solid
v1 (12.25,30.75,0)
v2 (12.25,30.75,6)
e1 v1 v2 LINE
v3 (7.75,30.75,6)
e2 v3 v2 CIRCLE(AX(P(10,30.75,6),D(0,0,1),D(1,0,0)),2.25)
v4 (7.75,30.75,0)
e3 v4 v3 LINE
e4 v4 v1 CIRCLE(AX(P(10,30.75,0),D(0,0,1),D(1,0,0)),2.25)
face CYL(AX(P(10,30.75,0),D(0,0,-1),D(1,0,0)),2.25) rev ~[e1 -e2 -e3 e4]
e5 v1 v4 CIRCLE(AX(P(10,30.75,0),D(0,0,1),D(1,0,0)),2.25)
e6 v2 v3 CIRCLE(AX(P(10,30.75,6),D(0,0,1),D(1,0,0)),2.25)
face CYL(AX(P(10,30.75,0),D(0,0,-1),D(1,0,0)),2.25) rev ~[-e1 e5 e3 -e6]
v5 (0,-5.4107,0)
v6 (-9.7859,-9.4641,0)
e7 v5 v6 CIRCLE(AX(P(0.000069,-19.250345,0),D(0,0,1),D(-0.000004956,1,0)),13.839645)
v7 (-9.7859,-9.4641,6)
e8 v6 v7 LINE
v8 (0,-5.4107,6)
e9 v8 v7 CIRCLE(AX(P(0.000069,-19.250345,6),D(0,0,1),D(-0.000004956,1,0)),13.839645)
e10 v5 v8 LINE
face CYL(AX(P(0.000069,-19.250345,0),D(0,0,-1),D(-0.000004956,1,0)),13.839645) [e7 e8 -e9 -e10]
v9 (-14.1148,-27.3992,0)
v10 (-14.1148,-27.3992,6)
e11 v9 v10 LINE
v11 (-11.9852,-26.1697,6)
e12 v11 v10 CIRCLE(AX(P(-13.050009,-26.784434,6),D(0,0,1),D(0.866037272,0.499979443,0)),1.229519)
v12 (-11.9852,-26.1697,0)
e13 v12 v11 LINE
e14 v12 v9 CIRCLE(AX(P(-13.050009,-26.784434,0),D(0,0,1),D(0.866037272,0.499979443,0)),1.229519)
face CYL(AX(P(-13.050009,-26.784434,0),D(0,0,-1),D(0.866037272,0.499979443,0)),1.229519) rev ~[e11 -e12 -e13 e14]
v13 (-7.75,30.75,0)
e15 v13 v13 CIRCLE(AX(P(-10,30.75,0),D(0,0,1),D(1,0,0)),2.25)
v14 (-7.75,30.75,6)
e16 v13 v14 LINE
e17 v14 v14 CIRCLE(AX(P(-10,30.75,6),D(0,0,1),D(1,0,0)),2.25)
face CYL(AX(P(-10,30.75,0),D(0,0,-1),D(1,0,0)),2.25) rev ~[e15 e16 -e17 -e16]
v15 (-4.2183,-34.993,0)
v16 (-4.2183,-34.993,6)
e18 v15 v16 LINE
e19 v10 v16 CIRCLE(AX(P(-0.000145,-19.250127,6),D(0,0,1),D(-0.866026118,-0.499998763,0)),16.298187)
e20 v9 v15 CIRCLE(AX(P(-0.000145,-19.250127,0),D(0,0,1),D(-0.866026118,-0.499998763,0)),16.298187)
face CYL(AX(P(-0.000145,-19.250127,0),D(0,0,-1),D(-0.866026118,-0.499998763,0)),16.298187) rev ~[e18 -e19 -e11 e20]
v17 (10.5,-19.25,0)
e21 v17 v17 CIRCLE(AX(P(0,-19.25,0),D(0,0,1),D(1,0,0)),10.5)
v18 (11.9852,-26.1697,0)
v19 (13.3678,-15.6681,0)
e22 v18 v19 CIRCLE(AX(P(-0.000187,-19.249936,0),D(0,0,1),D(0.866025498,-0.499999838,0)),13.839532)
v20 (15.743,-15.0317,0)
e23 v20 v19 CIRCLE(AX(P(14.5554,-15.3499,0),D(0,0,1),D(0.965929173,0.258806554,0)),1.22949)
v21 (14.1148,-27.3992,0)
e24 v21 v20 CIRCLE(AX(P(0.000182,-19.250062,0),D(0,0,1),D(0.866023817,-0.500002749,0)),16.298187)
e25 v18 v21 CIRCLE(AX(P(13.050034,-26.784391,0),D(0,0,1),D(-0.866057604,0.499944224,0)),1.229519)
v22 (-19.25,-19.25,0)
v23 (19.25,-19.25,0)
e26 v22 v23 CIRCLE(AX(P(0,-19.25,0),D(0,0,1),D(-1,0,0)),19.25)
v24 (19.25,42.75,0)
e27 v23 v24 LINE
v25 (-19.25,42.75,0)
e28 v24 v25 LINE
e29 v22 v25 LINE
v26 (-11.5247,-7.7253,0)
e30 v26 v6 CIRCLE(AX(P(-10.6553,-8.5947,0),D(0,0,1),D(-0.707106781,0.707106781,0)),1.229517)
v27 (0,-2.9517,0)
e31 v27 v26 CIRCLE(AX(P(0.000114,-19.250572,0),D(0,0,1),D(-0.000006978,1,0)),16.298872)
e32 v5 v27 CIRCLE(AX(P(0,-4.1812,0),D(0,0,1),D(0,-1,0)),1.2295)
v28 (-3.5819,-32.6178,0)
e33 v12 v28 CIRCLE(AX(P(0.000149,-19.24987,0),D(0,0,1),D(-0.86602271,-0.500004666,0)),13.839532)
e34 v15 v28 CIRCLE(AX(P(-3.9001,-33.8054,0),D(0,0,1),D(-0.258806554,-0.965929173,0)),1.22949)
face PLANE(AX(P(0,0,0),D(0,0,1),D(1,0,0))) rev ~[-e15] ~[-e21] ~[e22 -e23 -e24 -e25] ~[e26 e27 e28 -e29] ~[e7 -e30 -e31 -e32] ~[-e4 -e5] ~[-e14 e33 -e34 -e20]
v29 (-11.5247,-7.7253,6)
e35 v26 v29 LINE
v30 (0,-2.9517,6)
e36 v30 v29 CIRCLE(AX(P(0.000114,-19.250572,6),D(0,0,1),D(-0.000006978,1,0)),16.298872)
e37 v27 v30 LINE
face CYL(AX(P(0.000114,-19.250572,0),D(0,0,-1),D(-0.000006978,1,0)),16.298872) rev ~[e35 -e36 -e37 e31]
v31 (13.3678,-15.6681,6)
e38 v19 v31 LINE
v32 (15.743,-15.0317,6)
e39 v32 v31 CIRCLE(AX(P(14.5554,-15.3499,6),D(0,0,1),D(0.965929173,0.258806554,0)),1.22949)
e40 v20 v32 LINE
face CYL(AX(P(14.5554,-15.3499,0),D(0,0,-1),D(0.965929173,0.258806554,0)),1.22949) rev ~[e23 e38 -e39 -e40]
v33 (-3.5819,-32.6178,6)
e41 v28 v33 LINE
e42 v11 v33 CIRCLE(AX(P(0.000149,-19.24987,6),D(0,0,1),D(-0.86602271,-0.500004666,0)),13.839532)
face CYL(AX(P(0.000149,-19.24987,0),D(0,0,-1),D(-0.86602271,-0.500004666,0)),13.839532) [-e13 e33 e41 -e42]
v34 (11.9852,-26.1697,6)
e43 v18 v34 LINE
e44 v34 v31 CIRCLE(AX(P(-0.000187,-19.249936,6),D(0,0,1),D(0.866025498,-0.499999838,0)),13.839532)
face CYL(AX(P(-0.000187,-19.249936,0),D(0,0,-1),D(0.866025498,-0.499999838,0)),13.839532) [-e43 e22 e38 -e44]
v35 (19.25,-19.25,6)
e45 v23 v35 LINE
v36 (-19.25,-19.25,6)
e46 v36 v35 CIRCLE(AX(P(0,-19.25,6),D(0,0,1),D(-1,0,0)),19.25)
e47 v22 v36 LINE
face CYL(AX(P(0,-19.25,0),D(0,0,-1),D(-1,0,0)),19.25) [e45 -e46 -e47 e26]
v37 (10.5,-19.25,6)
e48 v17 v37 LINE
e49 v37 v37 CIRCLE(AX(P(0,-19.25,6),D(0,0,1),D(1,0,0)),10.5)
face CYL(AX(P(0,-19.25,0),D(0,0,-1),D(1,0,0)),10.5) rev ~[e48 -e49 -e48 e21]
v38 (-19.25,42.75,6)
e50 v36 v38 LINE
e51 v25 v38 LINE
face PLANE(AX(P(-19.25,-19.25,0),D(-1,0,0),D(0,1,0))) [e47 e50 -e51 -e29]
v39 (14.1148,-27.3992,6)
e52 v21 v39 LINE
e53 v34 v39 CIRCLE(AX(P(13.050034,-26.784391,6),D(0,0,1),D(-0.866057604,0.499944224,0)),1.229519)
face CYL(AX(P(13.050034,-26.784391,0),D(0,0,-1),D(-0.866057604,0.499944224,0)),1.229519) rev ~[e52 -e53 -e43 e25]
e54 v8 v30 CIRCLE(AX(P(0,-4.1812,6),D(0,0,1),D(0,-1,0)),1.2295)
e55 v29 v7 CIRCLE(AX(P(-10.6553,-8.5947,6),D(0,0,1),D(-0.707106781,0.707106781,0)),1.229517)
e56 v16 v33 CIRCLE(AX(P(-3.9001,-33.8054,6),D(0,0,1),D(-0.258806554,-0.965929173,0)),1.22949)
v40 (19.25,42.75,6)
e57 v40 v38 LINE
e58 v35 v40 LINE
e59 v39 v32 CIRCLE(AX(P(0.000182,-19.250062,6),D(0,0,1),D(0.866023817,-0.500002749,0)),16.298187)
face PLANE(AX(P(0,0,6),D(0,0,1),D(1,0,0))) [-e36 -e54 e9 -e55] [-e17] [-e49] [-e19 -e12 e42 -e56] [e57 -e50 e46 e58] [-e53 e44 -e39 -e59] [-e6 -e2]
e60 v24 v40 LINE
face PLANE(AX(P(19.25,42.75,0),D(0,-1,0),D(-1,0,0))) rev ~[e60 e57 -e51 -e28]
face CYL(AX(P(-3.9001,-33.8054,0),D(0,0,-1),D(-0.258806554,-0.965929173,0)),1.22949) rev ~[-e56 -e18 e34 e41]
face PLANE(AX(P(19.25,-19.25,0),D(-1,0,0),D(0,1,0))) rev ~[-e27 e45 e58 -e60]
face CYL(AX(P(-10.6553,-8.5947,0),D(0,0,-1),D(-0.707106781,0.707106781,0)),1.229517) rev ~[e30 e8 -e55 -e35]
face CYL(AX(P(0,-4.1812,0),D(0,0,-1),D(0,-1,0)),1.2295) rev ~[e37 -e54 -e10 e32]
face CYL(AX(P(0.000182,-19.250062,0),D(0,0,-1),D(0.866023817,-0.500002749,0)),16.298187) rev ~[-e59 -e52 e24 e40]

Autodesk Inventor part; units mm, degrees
ref_plane "YZ Plane" through (0, 0, 0) normal (1, 0, 0) x (0, 1, 0)
ref_plane "XZ Plane" through (0, 0, 0) normal (0, 1, 0) x (-1, 0, 0)
ref_plane "XY Plane" through (0, 0, 0) normal (0, 0, 1) x (1, 0, 0)
sketch "Sketch1" plane through (0, 0, 0) normal (0, 0, 1) x (1, 0, 0)
  arc A0 (-19.25, -19.25) -> (19.25, -19.25) centre (0, -19.25) ccw
  circle A1 centre (0, -19.25) radius 10.5
  arc A2 (11.9852, -26.1697) -> (14.1148, -27.3992) centre (13.05, -26.7844) ccw
  arc A3 (-11.9852, -26.1697) -> (-14.1148, -27.3992) centre (-13.05, -26.7844) ccw
  arc A4 (0, -5.4107) -> (0, -2.9517) centre (0, -4.1812) ccw
  line L0 (0, -19.25) -> (14.5554, -15.3499) construction
  line L1 (0, -19.25) -> (13.05, -26.7844) construction
  line L2 (0, -19.25) -> (-10.6553, -8.5947) construction
  line L3 (0, -19.25) -> (0, -4.1812) construction
  line L4 (0, -19.25) -> (-3.9001, -33.8054) construction
  line L5 (0, -19.25) -> (-13.05, -26.7844) construction
  arc A5 (-4.2183, -34.993) -> (-3.5819, -32.6178) centre (-3.9001, -33.8054) ccw
  arc A6 (15.743, -15.0317) -> (13.3678, -15.6681) centre (14.5554, -15.3499) ccw
  arc A7 (-11.5247, -7.7253) -> (-9.7859, -9.4641) centre (-10.6553, -8.5947) ccw
  arc A8 (0, -2.9517) -> (-11.5247, -7.7253) centre (0, -19.25) ccw
  arc A9 (0, -5.4107) -> (-9.7859, -9.4641) centre (0, -19.25) ccw
  arc A10 (11.9852, -26.1697) -> (13.3678, -15.6681) centre (0, -19.25) ccw
  arc A11 (14.1148, -27.3992) -> (15.743, -15.0317) centre (0, -19.25) ccw
  arc A12 (-11.9852, -26.1697) -> (-3.5819, -32.6178) centre (0, -19.25) ccw
  arc A13 (-14.1148, -27.3992) -> (-4.2183, -34.993) centre (0, -19.25) ccw
  line L6 (19.25, -19.25) -> (19.25, 42.75)
  line L7 (-19.25, -19.25) -> (-19.25, 42.75)
  line L8 (19.25, 42.75) -> (-19.25, 42.75)
  circle A14 centre (-10, 30.75) radius 2.25
  circle A15 centre (10, 30.75) radius 2.25
  line L9 (10, 30.75) -> (-10, 30.75)
  point P0 (0, 0)
  point P1 (19.25, 30.75)
  dimension "d0" = 21
  dimension "d1" = 45
  dimension "d2" = 45
  dimension "d3" = 45
  dimension "d4" = 2.459
  dimension "d5" = 2.459
  dimension "d6" = 2.459
  dimension "d7" = 2.459
  dimension "d8" = 2.459
  dimension "d9" = 2.459
  dimension "d11" = 62
  dimension "d14" = 19.25
  dimension "d21" = 4.5
  dimension "d22" = 12
  dimension "d23" = 4.5
  dimension "d24" = 20
  dimension "d25" = 9.25
  dimension "d26" = 38.5
extrude "Extrusion1" add sketch "Sketch1" along normal blind 6
equation "\"d8\" = d6"
equation "\"d9\" = d7"
equation "\"d23\" = d21"
equation "\"d25\" = -0.5 * d24 + 0.5 * d26"
properties part number "Joint1C_1" material "PET Plastic"
